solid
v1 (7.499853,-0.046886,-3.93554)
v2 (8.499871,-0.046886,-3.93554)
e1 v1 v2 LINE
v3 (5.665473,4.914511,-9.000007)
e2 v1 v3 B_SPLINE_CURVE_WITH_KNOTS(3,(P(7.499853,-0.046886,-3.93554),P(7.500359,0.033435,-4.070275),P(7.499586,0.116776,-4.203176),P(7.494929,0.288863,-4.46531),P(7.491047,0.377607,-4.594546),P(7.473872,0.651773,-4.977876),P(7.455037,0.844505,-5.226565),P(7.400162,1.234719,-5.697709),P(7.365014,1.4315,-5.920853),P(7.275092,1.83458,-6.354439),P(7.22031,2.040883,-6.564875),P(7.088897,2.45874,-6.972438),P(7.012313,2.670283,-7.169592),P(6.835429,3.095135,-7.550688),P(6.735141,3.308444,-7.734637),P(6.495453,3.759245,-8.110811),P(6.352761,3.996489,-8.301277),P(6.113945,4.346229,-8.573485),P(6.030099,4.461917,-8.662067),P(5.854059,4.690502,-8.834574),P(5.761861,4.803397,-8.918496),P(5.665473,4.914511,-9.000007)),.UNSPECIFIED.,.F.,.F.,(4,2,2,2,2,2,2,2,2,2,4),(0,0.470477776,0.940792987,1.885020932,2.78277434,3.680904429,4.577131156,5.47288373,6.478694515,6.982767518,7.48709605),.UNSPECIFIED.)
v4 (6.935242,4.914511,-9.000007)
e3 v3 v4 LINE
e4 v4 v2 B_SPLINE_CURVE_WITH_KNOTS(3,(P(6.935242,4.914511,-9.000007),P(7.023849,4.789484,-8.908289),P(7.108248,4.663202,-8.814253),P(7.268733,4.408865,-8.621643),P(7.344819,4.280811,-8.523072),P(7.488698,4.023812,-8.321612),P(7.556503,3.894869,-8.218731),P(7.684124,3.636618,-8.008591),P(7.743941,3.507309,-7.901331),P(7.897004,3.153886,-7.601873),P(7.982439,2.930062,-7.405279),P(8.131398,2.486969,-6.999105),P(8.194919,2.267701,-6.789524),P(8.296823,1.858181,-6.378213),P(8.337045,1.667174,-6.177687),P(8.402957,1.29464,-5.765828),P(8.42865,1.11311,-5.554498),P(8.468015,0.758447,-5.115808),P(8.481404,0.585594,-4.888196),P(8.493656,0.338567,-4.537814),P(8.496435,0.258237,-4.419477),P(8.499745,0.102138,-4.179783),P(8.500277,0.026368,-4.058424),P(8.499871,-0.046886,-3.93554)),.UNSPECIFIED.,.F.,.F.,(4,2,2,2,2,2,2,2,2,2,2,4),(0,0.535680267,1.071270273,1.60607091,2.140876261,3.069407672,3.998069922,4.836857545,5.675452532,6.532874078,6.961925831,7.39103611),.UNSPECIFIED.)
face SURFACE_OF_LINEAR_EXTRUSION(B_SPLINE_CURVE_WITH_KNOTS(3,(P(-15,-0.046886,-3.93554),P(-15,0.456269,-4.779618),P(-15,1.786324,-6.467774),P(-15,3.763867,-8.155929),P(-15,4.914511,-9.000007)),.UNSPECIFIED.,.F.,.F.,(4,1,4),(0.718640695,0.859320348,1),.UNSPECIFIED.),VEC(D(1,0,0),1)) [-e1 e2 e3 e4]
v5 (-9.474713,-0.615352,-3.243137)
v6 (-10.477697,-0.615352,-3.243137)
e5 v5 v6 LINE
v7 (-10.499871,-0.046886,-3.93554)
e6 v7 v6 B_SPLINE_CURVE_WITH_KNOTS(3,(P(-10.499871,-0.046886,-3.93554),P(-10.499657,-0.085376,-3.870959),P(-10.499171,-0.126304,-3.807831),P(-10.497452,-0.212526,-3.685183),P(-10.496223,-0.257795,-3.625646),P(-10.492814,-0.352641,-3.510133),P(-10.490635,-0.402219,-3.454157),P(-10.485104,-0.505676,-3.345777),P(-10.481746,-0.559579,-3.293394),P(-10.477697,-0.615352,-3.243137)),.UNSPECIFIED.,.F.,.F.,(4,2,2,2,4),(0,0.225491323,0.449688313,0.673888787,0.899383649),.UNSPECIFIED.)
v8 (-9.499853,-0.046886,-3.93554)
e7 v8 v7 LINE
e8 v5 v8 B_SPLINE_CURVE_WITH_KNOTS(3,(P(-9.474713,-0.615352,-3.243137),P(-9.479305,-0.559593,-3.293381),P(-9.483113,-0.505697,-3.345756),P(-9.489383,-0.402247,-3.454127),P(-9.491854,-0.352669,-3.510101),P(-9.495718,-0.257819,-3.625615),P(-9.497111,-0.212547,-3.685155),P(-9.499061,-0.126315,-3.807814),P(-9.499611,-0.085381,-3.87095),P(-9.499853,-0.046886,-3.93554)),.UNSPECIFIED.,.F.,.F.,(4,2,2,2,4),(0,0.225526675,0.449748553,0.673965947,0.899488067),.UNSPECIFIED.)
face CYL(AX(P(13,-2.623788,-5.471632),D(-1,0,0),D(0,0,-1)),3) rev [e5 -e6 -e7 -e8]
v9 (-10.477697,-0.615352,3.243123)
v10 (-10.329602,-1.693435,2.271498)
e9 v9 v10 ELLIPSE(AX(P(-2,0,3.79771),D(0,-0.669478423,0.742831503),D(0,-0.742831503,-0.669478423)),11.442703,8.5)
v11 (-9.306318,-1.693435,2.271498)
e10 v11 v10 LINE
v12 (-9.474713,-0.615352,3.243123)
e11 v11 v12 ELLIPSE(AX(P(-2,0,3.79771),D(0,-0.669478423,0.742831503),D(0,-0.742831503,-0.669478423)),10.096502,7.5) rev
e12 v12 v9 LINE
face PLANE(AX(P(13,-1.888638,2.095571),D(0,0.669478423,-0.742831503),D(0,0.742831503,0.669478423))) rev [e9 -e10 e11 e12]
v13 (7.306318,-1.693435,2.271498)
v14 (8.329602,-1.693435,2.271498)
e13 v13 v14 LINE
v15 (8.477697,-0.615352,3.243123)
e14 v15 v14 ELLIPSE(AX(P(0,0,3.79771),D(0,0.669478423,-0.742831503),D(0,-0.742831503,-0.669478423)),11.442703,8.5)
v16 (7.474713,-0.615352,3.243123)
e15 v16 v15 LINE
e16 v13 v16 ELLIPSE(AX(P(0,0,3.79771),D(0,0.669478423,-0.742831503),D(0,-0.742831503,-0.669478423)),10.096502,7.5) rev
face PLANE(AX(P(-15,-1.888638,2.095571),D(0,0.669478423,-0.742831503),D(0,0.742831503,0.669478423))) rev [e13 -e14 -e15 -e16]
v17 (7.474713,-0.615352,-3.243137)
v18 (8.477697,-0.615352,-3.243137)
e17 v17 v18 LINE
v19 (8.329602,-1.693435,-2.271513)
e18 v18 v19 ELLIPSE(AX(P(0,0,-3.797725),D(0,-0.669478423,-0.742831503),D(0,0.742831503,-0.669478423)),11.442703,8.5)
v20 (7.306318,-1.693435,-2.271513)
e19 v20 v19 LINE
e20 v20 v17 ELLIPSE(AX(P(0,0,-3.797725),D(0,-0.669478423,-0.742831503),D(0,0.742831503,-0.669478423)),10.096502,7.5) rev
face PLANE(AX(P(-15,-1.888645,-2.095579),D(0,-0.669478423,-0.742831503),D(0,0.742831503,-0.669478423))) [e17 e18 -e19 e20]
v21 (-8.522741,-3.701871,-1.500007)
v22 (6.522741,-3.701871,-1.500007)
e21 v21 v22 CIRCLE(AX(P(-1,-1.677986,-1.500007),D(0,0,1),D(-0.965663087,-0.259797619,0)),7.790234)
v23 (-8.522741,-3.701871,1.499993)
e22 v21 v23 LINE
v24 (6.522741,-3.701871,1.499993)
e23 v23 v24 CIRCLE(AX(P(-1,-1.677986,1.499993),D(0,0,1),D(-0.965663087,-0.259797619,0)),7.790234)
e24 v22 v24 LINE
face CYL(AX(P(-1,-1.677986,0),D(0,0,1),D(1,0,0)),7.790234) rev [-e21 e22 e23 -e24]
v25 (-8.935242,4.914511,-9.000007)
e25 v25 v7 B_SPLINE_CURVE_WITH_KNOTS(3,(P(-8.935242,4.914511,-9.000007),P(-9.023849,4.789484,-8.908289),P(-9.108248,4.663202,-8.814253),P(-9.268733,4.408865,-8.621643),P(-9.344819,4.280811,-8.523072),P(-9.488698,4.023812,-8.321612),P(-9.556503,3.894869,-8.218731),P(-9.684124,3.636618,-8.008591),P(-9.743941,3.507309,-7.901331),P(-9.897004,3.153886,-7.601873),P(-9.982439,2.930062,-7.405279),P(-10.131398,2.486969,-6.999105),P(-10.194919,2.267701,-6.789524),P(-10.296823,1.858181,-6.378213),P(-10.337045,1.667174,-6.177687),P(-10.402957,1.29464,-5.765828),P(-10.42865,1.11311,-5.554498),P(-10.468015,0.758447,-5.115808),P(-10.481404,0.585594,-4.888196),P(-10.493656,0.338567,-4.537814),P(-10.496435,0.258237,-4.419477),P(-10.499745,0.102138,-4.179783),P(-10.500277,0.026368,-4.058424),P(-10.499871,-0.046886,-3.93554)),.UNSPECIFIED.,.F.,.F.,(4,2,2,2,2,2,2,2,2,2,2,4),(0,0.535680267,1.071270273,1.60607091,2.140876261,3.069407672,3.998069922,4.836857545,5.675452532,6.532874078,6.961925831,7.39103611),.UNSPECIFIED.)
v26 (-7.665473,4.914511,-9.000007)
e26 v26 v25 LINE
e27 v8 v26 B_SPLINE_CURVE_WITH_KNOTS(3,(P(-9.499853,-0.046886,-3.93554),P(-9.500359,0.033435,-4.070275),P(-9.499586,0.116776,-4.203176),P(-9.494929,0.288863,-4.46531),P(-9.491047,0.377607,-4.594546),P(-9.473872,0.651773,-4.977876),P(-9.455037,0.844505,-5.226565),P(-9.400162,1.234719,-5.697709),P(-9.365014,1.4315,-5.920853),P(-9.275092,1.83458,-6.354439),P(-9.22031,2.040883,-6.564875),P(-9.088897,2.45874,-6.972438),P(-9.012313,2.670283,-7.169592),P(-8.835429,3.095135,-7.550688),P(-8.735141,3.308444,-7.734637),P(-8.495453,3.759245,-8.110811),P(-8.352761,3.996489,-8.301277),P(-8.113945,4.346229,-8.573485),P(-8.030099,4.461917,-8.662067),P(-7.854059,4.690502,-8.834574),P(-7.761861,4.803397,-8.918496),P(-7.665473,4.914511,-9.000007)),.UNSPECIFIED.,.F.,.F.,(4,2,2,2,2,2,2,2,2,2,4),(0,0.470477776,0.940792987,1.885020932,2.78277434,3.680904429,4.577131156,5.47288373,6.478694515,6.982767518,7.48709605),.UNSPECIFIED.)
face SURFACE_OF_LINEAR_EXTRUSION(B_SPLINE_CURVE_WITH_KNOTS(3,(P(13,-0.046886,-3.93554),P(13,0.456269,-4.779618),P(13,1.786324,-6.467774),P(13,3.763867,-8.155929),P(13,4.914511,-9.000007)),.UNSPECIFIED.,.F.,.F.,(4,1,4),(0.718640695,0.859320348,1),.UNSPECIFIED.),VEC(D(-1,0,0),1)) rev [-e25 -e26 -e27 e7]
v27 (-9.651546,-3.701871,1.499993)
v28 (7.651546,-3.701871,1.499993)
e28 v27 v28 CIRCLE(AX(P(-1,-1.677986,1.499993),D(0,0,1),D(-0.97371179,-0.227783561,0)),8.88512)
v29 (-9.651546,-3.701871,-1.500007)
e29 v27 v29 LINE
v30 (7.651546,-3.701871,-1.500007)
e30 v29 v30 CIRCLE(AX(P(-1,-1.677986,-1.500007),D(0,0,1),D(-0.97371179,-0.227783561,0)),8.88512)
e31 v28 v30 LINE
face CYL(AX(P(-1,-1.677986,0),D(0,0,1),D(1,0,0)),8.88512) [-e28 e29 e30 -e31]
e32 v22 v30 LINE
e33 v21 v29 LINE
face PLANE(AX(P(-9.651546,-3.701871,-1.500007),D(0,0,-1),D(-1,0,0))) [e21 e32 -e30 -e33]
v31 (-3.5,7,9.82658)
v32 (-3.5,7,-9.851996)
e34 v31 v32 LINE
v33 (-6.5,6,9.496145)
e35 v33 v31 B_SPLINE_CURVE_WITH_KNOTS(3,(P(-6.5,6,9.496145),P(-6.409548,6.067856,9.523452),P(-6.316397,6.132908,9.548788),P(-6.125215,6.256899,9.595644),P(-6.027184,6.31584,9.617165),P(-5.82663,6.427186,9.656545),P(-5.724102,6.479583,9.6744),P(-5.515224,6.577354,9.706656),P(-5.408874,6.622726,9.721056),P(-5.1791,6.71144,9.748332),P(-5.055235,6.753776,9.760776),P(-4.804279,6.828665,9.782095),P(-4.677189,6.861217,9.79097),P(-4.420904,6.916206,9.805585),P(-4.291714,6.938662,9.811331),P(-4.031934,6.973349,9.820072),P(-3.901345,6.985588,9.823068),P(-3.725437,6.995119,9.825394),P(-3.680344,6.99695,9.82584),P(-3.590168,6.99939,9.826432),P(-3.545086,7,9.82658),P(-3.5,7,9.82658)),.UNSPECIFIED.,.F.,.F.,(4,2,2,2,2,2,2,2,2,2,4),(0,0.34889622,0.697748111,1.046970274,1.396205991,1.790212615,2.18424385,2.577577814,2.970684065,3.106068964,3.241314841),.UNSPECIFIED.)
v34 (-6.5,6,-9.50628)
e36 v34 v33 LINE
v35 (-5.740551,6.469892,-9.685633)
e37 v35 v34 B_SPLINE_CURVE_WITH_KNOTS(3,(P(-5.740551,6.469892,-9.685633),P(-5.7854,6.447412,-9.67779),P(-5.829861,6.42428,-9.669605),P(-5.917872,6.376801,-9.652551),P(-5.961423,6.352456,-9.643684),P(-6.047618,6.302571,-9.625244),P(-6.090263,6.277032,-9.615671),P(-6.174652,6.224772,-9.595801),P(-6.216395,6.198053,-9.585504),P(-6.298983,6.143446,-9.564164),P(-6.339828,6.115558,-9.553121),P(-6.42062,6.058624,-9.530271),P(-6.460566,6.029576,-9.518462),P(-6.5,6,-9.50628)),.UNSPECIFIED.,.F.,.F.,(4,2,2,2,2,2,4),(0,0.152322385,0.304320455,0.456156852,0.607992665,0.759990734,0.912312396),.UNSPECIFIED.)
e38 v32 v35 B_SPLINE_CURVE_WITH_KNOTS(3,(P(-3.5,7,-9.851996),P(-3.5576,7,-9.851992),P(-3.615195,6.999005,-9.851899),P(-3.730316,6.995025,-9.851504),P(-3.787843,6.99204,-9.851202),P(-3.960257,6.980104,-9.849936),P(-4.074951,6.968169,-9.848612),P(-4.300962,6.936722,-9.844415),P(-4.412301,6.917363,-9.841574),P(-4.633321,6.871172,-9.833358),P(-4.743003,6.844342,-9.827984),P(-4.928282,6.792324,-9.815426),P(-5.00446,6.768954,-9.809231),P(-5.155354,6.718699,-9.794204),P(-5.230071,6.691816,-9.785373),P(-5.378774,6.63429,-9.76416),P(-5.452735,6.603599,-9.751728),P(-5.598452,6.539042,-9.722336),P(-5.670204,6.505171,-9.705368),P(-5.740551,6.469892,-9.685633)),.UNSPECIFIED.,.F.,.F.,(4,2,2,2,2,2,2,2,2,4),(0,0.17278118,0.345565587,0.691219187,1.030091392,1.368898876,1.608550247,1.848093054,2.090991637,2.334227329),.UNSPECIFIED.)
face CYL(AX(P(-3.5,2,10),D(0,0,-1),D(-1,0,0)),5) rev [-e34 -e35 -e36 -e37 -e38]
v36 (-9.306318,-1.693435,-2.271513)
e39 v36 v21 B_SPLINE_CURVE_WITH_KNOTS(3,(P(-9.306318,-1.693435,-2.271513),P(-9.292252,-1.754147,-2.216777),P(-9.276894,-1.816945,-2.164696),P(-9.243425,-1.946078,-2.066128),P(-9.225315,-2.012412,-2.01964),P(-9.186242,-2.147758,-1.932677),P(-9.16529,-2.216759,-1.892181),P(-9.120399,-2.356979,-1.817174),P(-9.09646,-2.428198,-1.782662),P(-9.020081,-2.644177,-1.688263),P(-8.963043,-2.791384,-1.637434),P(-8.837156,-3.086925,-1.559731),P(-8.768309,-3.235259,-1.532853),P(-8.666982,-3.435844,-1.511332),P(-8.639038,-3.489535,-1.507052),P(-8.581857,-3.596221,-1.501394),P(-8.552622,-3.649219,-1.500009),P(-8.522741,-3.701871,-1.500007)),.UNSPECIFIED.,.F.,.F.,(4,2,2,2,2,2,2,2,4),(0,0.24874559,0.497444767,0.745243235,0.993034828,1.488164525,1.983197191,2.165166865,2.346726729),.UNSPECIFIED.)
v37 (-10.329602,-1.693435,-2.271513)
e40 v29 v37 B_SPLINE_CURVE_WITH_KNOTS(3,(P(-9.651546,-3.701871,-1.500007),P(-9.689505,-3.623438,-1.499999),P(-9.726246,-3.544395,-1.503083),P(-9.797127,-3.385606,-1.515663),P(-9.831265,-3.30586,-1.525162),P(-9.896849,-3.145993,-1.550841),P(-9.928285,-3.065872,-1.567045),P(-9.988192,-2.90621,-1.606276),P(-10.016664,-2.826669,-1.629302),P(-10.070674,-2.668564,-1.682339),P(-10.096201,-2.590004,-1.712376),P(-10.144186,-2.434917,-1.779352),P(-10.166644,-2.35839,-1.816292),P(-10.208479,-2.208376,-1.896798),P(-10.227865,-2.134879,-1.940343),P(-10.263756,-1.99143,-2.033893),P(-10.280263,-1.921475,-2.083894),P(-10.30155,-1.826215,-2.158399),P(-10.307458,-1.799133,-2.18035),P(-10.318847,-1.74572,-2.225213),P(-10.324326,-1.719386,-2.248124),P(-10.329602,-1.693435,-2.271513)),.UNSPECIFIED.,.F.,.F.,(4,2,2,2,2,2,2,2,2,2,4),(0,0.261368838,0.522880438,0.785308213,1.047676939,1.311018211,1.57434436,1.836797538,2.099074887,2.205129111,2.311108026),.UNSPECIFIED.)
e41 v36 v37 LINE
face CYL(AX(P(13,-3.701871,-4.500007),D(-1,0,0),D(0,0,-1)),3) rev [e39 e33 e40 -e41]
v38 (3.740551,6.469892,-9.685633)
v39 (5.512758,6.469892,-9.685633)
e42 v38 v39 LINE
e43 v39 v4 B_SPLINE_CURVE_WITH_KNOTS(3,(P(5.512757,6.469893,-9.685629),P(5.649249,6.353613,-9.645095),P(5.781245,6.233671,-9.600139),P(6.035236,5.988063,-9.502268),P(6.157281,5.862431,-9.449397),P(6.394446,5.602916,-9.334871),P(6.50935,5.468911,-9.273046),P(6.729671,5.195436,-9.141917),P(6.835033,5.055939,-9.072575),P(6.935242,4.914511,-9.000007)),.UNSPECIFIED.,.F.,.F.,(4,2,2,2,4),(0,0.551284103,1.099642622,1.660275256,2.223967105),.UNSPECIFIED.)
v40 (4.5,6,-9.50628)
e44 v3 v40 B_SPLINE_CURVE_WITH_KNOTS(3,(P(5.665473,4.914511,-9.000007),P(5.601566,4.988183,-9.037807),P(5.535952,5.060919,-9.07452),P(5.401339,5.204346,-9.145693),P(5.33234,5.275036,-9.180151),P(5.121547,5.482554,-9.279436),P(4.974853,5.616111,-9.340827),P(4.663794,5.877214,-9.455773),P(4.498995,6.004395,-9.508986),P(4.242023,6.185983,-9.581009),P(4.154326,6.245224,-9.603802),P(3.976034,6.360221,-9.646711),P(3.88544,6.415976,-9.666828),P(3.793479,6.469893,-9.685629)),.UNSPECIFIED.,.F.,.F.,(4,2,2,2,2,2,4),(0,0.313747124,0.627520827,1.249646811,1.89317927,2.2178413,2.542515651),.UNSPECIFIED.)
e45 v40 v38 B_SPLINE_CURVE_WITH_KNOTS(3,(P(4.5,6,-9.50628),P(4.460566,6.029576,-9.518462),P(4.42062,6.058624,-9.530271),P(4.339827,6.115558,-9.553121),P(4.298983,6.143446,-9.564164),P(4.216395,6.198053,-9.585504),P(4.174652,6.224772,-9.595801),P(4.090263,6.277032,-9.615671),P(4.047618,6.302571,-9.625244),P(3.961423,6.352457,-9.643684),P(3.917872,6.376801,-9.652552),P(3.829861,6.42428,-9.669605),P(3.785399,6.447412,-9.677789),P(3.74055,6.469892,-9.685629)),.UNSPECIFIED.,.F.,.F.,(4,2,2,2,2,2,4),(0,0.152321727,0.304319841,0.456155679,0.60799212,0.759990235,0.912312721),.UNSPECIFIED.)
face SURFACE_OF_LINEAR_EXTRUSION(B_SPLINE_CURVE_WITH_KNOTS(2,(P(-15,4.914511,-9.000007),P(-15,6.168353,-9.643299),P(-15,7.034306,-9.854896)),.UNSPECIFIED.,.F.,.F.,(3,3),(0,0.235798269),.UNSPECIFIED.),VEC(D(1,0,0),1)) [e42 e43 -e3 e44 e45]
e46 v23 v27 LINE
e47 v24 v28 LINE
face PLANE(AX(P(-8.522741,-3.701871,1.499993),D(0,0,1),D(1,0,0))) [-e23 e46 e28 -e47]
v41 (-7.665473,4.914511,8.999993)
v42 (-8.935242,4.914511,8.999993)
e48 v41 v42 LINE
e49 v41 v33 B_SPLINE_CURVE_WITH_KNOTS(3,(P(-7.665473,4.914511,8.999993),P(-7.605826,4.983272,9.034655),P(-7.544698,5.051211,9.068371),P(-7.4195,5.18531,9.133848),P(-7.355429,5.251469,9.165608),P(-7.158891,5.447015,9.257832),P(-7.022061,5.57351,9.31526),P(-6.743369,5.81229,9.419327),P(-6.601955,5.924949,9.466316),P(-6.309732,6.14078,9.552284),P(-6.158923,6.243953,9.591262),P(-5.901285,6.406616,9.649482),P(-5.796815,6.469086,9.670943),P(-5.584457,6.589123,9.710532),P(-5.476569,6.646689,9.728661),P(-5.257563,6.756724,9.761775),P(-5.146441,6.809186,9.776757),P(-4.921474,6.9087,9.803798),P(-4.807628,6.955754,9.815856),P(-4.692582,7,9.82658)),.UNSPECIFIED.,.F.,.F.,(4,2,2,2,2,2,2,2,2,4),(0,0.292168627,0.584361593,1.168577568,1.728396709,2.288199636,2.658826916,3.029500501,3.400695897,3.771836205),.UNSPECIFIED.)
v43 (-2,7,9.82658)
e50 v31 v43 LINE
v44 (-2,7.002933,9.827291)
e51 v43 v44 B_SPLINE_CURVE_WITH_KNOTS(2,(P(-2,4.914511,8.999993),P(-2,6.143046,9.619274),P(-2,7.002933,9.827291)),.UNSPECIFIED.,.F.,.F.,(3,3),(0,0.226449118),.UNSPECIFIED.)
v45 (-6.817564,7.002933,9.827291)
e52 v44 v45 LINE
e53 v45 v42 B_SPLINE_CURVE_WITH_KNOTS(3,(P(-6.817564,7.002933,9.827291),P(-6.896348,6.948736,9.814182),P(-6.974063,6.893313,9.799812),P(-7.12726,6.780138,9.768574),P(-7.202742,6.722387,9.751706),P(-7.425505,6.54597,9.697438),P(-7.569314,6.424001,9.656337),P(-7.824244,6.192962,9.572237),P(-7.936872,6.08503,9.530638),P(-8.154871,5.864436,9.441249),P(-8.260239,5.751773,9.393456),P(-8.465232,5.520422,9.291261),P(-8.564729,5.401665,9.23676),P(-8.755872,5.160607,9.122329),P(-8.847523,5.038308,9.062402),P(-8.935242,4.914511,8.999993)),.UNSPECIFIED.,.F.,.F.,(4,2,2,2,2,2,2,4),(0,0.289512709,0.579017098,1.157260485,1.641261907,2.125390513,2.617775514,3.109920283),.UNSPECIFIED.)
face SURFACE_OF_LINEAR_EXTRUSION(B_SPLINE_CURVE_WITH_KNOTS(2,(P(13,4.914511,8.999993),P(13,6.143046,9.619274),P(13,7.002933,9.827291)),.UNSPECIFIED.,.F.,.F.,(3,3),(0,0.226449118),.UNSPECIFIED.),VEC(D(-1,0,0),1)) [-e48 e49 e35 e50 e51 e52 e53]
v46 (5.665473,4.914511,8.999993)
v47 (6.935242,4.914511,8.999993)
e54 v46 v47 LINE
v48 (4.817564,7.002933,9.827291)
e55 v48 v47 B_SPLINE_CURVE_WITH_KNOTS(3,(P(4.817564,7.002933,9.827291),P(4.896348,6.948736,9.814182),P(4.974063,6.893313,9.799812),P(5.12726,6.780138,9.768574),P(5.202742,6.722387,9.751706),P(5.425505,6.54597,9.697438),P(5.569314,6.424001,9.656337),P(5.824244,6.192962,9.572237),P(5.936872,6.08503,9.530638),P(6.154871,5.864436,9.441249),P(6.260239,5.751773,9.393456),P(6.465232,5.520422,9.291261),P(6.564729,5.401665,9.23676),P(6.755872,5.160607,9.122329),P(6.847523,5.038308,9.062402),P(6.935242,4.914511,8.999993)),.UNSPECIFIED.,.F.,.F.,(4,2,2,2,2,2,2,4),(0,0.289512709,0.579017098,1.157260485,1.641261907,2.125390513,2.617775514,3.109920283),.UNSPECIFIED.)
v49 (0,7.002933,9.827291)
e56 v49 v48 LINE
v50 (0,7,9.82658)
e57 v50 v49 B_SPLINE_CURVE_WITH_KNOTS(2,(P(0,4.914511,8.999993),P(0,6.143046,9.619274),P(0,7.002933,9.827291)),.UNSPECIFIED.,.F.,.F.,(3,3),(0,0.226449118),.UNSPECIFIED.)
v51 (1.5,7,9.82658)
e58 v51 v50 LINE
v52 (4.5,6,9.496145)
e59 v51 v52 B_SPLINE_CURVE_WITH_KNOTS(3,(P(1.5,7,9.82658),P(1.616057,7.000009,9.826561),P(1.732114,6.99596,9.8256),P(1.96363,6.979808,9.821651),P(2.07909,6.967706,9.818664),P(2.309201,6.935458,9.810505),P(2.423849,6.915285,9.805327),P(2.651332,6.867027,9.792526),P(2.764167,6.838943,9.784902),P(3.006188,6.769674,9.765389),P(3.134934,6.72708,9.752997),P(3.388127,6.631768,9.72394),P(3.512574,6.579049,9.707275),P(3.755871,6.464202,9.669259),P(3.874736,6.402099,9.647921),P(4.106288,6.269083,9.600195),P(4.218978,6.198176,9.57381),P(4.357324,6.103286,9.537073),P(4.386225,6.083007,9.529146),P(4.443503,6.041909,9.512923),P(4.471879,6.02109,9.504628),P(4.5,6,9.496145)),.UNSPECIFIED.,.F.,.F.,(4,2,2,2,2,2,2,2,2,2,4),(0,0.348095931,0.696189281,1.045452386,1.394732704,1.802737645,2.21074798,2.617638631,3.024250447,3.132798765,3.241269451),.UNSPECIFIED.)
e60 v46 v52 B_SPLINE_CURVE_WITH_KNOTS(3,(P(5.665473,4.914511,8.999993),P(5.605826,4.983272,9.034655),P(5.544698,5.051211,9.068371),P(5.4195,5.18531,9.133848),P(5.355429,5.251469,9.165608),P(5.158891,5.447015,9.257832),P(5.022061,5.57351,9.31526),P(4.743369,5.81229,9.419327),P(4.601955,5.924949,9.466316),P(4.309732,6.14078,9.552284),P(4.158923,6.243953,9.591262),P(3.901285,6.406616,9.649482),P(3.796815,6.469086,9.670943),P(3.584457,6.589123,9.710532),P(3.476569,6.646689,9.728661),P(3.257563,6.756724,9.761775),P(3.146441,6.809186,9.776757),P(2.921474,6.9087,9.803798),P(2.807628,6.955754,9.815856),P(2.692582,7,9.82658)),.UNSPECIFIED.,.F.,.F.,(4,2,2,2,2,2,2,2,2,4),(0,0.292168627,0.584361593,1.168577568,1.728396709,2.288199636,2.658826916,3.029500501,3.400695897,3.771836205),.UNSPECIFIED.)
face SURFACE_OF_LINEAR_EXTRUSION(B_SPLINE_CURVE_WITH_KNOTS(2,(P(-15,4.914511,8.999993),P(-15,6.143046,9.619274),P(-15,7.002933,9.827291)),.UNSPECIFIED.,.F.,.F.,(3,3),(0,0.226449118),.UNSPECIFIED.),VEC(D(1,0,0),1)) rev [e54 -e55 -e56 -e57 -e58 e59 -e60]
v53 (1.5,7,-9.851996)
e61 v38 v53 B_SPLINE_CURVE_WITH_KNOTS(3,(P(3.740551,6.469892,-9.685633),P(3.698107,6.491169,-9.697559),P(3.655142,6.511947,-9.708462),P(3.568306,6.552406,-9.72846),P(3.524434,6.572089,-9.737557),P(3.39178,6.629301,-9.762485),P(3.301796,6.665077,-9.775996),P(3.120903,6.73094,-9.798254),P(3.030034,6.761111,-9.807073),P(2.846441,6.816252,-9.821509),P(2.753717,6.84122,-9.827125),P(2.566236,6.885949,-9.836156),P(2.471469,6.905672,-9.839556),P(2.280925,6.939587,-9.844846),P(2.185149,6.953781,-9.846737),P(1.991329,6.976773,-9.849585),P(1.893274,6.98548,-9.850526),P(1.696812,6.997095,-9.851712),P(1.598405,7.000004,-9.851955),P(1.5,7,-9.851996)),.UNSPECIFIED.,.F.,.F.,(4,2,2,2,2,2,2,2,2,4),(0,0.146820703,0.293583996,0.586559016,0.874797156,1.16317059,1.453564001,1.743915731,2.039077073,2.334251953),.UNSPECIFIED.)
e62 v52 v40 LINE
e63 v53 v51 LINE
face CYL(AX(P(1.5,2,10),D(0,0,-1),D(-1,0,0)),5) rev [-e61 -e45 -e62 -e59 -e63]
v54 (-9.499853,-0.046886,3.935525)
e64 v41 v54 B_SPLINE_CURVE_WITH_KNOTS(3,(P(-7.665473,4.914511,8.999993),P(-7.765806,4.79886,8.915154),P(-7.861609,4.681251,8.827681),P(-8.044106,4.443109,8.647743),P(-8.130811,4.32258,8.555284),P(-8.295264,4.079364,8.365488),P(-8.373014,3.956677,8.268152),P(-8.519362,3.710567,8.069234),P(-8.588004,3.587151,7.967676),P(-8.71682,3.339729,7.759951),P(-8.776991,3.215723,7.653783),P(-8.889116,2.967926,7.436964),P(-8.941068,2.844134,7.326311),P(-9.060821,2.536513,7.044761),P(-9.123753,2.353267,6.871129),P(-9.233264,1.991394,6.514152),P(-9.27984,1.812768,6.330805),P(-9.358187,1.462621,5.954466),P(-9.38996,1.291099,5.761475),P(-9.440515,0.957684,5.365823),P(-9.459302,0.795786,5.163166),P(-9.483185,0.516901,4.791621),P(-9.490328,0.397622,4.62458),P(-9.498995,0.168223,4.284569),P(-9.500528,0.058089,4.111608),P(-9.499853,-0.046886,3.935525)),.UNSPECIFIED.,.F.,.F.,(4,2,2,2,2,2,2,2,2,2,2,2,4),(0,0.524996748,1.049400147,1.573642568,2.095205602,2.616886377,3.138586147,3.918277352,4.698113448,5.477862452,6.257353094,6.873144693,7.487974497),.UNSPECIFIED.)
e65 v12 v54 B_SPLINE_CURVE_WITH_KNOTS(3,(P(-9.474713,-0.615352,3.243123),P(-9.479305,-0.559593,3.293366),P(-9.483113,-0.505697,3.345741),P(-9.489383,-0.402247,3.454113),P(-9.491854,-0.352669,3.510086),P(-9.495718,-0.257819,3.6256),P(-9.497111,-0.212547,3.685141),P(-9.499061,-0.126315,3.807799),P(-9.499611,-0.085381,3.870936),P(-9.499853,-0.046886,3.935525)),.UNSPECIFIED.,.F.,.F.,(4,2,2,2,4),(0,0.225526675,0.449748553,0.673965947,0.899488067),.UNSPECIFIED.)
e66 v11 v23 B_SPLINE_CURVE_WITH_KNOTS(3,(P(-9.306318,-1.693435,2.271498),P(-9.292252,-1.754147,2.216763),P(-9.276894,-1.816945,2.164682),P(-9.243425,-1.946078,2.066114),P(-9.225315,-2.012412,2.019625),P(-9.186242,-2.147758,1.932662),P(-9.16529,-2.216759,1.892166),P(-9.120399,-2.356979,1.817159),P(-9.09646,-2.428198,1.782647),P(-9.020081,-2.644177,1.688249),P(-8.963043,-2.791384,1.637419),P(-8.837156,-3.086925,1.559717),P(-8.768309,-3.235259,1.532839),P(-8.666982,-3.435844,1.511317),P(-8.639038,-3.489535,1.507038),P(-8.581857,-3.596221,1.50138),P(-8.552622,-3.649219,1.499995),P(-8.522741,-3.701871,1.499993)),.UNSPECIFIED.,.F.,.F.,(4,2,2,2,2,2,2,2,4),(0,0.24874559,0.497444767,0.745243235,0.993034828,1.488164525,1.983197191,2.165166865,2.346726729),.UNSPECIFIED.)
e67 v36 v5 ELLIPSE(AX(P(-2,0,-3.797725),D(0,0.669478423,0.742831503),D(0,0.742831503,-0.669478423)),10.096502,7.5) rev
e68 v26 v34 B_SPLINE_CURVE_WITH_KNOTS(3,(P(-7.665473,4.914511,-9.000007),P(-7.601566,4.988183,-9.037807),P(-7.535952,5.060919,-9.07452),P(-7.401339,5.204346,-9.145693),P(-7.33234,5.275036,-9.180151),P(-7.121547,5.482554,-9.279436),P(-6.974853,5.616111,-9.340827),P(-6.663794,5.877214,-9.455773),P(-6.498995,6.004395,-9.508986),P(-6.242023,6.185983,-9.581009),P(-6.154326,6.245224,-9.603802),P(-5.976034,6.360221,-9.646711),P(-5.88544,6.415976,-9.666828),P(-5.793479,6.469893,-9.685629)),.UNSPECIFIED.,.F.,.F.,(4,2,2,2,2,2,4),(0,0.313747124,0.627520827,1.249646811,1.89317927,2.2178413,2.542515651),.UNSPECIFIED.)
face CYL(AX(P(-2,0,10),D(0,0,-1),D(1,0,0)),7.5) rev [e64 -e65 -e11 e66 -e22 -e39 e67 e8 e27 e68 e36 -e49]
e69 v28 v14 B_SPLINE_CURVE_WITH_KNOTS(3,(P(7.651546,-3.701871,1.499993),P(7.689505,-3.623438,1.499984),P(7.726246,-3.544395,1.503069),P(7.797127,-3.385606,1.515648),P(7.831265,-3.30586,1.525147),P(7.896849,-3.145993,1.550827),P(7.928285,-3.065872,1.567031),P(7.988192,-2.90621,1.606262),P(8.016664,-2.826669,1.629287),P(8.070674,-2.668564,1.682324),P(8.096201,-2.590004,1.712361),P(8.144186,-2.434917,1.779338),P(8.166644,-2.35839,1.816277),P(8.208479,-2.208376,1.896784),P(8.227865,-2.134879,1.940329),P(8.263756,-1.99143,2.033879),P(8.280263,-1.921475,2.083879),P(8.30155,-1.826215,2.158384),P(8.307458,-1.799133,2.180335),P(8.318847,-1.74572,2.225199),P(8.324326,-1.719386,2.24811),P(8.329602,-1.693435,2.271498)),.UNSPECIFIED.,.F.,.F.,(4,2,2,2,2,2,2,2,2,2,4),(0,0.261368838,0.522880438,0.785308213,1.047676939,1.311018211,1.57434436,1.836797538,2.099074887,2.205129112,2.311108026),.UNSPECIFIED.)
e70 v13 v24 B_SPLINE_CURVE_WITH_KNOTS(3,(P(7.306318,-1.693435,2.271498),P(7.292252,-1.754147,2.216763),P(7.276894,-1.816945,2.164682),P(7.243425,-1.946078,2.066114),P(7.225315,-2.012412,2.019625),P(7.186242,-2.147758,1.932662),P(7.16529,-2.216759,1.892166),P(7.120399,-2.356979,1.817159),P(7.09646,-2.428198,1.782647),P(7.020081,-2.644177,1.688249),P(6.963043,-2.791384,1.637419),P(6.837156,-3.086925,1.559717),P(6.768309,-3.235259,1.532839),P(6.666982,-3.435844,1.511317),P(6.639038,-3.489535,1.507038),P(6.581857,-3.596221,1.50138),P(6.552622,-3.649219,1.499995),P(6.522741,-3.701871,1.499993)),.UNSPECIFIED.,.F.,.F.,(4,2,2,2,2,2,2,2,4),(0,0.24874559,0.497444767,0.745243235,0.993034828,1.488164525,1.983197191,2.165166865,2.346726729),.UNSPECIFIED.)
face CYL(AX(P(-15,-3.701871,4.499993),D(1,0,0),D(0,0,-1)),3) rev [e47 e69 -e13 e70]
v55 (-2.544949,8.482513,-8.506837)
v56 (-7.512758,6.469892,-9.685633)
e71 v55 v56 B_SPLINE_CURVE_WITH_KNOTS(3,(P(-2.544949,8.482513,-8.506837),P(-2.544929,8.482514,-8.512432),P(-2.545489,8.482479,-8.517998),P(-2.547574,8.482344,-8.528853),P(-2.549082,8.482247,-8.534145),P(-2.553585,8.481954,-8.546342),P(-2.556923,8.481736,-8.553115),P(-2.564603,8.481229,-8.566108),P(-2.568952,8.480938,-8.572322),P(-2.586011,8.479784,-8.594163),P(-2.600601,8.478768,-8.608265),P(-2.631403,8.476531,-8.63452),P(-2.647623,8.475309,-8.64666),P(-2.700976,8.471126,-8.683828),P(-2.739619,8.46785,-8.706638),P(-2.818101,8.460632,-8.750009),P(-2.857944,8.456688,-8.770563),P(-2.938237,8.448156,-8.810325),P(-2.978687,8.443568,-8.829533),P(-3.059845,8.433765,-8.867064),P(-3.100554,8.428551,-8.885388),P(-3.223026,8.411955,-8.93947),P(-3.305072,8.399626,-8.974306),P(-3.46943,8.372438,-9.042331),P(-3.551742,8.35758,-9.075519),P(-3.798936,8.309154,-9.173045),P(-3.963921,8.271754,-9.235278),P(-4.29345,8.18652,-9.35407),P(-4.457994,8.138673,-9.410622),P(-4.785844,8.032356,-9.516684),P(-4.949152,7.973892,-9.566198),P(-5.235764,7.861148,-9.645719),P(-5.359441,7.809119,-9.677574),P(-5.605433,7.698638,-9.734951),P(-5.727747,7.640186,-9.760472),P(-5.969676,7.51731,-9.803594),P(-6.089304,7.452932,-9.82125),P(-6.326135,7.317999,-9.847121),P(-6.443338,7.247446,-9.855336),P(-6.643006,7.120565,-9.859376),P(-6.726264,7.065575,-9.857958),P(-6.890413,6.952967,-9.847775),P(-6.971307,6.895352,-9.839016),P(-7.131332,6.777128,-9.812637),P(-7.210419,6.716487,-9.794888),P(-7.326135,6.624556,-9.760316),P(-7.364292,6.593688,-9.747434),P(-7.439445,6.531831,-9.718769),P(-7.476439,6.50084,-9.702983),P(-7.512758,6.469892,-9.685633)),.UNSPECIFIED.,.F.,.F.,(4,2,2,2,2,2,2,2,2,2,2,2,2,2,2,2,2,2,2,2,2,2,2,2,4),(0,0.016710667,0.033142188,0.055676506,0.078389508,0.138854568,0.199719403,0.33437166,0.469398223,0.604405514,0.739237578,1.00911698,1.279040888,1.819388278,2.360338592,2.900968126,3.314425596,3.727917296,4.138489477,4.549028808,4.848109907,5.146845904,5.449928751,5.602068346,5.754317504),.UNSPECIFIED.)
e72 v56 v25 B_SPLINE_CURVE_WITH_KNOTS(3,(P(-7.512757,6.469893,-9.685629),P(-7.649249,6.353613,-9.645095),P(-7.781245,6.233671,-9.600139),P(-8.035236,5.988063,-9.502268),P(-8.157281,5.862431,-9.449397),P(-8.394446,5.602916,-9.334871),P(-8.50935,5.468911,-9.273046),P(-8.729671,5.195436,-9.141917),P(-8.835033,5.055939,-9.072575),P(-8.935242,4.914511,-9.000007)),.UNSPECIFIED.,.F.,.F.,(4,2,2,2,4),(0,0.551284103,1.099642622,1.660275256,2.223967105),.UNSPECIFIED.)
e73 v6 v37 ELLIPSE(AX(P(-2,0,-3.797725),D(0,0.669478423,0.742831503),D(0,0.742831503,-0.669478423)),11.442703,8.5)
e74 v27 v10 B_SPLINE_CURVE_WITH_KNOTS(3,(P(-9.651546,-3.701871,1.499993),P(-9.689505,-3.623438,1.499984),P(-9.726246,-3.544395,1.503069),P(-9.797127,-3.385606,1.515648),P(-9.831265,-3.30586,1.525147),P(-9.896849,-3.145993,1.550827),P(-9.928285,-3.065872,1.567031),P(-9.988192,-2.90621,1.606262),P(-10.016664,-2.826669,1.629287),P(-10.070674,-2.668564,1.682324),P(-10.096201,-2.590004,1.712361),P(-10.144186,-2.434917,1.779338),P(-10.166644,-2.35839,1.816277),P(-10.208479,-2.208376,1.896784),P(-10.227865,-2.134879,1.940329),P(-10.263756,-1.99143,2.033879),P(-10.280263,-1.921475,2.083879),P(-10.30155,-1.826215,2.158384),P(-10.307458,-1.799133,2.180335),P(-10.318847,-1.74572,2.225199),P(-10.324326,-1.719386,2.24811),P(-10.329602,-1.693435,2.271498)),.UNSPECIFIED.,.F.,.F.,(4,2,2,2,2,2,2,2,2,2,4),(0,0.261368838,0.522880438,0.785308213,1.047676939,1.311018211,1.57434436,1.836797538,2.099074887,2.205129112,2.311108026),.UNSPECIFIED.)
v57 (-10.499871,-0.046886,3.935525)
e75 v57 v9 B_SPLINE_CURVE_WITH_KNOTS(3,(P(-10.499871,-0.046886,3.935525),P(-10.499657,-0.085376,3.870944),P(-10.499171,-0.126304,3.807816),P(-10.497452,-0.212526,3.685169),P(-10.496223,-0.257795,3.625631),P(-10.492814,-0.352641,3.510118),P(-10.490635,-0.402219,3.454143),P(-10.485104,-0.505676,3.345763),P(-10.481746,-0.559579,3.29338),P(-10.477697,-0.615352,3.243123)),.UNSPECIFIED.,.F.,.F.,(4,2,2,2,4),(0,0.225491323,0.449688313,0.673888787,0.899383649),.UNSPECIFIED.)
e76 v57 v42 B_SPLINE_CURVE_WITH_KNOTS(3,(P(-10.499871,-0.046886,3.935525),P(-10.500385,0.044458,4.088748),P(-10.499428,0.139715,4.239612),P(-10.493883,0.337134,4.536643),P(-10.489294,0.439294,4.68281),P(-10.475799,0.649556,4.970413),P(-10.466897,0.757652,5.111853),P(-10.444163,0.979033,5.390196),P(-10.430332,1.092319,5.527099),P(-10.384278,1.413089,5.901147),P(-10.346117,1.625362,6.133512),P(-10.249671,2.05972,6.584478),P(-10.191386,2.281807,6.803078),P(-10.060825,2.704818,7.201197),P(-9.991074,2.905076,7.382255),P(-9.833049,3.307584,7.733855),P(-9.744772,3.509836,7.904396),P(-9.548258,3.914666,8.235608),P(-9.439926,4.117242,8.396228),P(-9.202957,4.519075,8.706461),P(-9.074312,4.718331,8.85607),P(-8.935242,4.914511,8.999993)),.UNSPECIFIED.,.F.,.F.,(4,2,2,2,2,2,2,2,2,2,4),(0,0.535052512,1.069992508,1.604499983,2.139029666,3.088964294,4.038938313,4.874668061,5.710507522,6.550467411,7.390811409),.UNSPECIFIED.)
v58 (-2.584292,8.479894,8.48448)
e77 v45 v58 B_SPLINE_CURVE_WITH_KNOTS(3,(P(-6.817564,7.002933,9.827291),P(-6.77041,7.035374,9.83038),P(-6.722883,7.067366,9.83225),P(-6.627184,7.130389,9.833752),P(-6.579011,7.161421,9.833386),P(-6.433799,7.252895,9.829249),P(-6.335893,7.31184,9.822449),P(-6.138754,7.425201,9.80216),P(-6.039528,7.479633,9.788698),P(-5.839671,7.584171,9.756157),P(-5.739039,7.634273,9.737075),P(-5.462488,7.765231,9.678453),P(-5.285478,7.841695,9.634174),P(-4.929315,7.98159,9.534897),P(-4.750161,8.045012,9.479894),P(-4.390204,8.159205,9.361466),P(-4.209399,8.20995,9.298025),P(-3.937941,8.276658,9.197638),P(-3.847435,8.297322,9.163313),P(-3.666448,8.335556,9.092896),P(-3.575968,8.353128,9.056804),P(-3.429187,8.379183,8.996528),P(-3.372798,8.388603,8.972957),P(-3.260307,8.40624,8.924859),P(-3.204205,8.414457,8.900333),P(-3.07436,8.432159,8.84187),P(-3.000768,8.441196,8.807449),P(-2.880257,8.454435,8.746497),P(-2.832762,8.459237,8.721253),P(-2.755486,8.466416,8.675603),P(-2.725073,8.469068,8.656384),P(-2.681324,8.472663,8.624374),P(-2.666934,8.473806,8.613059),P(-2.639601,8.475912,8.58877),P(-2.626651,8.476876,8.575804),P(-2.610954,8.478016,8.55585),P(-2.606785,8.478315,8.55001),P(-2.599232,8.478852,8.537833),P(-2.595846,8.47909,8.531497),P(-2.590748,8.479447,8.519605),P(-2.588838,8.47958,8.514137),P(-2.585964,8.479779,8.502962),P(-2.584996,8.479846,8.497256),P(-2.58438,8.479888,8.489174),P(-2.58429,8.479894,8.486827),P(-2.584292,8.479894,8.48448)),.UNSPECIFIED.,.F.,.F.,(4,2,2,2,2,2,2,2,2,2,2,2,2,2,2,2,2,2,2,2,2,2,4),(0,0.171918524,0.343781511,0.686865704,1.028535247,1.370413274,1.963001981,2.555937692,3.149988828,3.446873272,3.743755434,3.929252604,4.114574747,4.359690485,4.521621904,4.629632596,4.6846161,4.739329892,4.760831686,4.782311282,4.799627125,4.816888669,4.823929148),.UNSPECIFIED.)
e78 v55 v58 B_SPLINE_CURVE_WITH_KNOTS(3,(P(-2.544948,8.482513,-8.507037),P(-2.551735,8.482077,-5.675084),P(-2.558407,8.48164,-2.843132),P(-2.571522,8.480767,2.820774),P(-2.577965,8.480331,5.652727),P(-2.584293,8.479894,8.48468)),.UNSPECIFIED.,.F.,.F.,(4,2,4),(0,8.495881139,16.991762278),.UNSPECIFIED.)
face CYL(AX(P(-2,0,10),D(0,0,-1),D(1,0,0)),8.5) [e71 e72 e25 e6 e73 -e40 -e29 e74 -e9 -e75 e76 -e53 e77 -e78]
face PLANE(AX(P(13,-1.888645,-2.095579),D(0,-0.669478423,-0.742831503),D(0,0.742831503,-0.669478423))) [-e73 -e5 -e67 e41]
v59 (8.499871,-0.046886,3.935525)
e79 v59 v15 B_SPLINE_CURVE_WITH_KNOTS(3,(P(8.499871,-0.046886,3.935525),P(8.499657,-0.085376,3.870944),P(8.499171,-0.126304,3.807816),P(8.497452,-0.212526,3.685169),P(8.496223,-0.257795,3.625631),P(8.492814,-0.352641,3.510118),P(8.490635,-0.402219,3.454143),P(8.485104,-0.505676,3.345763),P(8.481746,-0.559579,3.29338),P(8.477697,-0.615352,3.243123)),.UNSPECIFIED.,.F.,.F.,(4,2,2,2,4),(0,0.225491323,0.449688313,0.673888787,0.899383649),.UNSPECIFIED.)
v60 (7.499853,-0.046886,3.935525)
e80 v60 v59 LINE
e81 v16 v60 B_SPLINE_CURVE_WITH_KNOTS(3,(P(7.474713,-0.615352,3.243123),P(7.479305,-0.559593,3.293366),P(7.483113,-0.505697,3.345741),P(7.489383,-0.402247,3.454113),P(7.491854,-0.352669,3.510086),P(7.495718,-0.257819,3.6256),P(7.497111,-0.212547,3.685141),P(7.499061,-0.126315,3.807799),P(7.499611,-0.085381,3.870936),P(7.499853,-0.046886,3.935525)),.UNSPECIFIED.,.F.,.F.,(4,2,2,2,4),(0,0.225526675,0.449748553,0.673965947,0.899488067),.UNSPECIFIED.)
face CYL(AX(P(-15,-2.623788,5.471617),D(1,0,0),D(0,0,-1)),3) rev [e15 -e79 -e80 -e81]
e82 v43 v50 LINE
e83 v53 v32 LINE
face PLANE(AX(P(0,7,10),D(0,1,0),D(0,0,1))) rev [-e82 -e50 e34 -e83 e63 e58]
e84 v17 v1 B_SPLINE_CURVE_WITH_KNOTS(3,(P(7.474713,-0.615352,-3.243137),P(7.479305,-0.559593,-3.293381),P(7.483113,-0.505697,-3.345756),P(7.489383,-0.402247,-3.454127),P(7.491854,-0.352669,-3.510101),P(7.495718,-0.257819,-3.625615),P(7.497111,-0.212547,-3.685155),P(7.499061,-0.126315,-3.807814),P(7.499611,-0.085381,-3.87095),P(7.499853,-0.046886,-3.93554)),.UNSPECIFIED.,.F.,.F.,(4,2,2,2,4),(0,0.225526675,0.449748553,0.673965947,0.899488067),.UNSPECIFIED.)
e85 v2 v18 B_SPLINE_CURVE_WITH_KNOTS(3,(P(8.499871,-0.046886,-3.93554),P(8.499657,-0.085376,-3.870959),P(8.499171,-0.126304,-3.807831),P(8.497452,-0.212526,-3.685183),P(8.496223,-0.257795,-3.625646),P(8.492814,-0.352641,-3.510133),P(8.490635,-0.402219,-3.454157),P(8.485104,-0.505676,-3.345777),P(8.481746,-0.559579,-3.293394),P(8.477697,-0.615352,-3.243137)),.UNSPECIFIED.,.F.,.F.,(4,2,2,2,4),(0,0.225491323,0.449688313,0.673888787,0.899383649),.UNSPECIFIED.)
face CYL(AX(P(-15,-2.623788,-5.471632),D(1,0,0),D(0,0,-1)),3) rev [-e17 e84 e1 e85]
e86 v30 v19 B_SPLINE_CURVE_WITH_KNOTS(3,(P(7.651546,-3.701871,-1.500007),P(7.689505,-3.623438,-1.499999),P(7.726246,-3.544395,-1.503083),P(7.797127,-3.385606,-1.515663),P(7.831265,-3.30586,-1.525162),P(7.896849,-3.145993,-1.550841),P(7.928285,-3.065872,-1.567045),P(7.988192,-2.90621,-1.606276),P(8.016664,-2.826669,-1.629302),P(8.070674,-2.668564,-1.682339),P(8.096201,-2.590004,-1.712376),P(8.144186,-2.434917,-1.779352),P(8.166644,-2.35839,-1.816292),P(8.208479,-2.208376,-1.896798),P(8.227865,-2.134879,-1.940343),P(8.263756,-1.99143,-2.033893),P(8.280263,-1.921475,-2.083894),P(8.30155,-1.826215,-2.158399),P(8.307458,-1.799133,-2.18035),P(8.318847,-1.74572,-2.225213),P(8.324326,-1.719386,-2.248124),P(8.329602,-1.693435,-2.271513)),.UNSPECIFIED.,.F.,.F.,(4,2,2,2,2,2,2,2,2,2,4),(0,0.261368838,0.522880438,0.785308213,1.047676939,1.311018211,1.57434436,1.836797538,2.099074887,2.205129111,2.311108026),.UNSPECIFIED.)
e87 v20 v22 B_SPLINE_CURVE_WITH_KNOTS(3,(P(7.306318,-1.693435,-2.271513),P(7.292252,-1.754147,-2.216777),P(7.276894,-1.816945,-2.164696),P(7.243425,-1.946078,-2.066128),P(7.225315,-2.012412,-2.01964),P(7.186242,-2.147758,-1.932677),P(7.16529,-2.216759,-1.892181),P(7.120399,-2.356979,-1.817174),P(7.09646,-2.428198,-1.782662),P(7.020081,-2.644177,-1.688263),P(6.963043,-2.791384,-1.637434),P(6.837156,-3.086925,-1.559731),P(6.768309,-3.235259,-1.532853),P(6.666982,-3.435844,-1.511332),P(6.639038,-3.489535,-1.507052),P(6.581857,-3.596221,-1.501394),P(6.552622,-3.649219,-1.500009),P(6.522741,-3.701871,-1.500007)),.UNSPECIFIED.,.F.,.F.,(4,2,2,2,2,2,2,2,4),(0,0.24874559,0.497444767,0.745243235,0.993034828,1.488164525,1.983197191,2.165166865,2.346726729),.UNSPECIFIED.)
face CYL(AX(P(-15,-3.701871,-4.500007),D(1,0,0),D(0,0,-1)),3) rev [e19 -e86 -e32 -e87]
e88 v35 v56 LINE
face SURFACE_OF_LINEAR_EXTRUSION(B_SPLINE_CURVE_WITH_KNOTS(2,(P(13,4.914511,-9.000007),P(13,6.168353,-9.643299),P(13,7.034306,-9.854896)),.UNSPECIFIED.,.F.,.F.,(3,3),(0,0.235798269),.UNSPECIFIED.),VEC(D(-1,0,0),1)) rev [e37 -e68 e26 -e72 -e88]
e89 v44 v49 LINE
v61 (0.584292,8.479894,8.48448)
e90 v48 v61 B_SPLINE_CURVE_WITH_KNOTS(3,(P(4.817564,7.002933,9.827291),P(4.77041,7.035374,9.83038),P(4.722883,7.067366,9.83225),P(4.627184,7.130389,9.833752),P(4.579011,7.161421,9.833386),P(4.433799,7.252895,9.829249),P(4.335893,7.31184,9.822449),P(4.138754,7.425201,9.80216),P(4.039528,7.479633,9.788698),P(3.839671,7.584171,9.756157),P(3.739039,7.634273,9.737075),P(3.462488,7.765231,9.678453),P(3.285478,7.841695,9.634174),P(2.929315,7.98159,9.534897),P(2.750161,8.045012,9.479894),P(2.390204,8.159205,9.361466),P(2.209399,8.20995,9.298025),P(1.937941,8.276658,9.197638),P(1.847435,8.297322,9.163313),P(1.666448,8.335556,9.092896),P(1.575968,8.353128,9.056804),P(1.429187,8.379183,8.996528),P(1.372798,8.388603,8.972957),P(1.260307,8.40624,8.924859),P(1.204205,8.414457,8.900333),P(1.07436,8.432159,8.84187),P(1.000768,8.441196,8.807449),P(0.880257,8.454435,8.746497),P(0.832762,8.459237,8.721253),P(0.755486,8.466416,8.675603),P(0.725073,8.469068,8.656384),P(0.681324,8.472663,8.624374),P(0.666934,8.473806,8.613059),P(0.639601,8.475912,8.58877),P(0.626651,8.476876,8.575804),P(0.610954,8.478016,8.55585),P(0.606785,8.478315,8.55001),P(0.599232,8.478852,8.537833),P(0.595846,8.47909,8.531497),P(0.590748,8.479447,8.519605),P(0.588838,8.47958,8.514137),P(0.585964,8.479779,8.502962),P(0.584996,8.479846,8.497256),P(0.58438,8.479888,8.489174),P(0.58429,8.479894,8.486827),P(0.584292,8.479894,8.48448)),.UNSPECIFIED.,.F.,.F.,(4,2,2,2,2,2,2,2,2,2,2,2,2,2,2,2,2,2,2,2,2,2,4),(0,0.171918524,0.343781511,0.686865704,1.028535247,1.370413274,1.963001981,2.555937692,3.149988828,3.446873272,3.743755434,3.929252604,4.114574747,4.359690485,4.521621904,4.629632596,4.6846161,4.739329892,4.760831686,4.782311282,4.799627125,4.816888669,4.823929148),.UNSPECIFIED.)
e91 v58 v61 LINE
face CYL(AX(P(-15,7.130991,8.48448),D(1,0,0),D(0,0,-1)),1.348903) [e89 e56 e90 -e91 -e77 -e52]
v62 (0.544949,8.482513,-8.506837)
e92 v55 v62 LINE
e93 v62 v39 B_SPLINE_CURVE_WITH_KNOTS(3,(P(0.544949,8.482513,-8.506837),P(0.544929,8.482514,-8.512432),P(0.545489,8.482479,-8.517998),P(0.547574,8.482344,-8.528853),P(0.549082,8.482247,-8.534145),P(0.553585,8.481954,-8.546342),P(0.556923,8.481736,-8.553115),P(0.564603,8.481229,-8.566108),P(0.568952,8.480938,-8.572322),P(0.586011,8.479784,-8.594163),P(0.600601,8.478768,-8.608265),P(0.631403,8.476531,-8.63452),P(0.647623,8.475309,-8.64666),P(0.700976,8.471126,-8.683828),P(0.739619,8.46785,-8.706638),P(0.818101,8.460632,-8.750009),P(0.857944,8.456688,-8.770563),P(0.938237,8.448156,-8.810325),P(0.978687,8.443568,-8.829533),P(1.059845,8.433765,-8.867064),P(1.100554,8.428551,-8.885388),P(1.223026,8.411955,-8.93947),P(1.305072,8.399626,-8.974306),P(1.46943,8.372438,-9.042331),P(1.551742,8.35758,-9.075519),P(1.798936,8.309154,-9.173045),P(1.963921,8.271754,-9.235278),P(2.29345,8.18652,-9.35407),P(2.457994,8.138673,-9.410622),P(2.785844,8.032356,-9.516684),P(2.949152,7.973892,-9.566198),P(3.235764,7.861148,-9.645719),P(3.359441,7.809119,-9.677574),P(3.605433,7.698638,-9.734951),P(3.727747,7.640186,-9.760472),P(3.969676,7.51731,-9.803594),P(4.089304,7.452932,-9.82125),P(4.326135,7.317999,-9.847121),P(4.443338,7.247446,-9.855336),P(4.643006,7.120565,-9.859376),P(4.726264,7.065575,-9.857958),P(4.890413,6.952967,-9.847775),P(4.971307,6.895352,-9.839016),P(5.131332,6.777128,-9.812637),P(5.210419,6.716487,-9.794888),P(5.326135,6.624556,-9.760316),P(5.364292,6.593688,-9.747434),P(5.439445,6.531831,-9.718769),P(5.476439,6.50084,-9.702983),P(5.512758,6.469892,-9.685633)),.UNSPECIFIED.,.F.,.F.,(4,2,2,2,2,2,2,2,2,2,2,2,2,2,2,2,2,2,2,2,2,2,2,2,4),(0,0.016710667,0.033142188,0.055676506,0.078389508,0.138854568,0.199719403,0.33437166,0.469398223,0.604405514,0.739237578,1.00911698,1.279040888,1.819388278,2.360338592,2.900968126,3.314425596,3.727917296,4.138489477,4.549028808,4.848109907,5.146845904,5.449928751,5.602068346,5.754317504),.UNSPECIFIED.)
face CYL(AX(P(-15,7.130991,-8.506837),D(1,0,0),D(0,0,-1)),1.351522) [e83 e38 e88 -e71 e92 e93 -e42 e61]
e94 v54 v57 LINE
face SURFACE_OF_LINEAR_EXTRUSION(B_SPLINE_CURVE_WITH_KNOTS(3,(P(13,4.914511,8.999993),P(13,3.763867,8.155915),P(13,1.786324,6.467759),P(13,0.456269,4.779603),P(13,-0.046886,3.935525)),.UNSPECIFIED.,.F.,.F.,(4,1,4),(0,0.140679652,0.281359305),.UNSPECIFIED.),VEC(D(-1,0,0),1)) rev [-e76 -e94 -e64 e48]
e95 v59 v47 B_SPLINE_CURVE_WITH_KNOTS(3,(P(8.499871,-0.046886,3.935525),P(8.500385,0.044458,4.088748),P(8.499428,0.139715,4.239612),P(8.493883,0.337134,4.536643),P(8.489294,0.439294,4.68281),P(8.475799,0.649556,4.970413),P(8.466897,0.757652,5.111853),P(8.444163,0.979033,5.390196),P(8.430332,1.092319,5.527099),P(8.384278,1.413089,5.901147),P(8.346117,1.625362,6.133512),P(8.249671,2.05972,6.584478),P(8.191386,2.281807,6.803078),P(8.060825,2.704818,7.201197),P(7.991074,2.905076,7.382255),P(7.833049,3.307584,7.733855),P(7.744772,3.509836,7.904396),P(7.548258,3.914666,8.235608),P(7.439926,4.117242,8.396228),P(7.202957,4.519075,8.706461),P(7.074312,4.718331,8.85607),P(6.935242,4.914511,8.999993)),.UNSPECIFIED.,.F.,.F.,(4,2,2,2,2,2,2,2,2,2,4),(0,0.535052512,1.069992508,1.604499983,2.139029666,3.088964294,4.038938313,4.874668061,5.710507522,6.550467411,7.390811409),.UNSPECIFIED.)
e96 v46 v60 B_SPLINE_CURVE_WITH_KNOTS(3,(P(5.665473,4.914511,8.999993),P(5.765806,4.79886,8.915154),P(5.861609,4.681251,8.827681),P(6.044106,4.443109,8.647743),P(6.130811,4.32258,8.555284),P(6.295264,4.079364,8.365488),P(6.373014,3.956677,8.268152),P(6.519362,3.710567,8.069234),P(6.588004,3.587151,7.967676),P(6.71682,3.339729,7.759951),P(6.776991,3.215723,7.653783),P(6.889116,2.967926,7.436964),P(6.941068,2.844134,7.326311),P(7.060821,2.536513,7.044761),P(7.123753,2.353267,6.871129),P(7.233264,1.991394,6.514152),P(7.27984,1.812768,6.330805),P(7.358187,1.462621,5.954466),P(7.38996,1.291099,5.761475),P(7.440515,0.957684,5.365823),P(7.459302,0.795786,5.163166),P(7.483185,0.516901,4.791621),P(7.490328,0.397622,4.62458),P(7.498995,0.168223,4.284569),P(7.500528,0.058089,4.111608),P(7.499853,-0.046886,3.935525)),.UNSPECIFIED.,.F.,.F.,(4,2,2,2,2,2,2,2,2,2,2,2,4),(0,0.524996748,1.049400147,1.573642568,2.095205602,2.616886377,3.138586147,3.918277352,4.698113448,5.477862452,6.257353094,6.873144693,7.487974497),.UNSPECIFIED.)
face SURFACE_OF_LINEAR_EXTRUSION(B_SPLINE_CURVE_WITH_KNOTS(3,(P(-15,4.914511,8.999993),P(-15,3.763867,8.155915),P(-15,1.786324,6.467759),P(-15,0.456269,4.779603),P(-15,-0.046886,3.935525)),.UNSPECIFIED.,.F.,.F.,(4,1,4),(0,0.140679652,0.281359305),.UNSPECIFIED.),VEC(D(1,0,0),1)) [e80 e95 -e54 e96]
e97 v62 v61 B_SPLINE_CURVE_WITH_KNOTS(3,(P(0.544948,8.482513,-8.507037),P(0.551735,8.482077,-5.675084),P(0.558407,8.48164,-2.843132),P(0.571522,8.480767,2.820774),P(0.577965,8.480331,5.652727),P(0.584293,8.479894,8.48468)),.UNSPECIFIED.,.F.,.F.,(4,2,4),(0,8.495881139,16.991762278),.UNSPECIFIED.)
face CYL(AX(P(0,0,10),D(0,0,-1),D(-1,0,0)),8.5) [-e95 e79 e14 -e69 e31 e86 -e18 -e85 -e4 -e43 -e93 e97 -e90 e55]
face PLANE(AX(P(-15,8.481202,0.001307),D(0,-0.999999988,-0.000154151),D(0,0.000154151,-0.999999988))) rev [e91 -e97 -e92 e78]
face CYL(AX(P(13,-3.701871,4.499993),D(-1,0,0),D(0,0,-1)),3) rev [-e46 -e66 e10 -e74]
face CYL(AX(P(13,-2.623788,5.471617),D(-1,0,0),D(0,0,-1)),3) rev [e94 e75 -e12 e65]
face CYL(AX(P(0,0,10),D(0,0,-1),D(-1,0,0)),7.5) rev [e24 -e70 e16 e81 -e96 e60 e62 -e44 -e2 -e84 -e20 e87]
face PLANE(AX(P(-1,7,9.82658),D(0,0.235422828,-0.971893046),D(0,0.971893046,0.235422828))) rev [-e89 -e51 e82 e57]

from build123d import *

# Parameters (mm, degrees)
RESSALTO_EXTRUS_O1_DEPTH  = 10
CORTE_EXTRUS_O8_OUTLINE_W = 20
CORTE_EXTRUS_O8_OUTLINE_H = 20
CORTE_EXTRUS_O8_DEPTH     = 8.5
RESSALTO_EXTRUS_O2_START  = 1
RESSALTO_EXTRUS_O2_DEPTH  = 1
VARREDURA3_START          = -1.500007282
VARREDURA3_DEPTH          = 3
CORTE_EXTRUS_O9_DEPTH     = 15.5
FILETE1_R                 = 5


# Read off the part's stored shape, not the designer's step: Corte-extrusão8, Varredura3
with BuildPart() as part:
    # Esboço1 → Ressalto-extrusão1 (new, symmetric)
    with BuildSketch(Plane.XY):
        with BuildLine():
            Line((0, 8.5), (0, 7))
            Line((0, 7), (2.692582404, 7))
            ThreePointArc((2.692582404, 7), (7.373940602, -1.369306394), (0, -7.5))
            Line((0, -7.5), (0, -8.5))
            ThreePointArc((0, -8.5), (8.5, 0), (0, 8.5))
        make_face()
    extrude(amount=RESSALTO_EXTRUS_O1_DEPTH, both=True)

    # Corte-extrusão8 outline → Corte-extrusão8 (cut)
    with BuildSketch(Plane(origin=(0, 0, 0), x_dir=(0, 0, -1), z_dir=(1, 0, 0))):
        Rectangle(CORTE_EXTRUS_O8_OUTLINE_W, CORTE_EXTRUS_O8_OUTLINE_H)
        with BuildLine():
            add(Edge.make_bspline(
                [(9.000007282, 4.914510614), (9.447062759, 5.785868524), (9.685629081, 6.469892836)],
                knots=[0, 0, 0, 0.163868034, 0.163868034, 0.163868034], degree=2))
            add(Edge.make_bspline(
                [(3.935539792, -0.04688611), (4.779617707, 0.456269007), (6.467773537, 1.786323577), (8.155929367, 3.763866822), (9.000007282, 4.914510614)],
                knots=[0.718640695, 0.718640695, 0.718640695, 0.718640695, 0.859320348, 1, 1, 1, 1], degree=3))
            ThreePointArc((3.935539792, -0.04688611), (3.567999305, -0.305127766), (3.243137148, -0.615352428))
            Line((3.243137148, -0.615352428), (2.271512773, -1.693435261))
            ThreePointArc((2.271512773, -1.693435261), (1.699517724, -2.626111152), (1.500007282, -3.701870529))
            Line((1.500007282, -3.701870529), (-1.499992718, -3.701870529))
            ThreePointArc((-1.499992718, -3.701870529), (-1.69950316, -2.626111152), (-2.271498209, -1.693435261))
            Line((-2.271498209, -1.693435261), (-3.243122584, -0.615352428))
            ThreePointArc((-3.243122584, -0.615352428), (-3.567984742, -0.305127766), (-3.935525229, -0.04688611))
            add(Edge.make_bspline(
                [(-8.999992718, 4.914510614), (-8.155914803, 3.763866822), (-6.467758973, 1.786323577), (-4.779603143, 0.456269007), (-3.935525229, -0.04688611)],
                knots=[0, 0, 0, 0, 0.140679652, 0.281359305, 0.281359305, 0.281359305, 0.281359305], degree=3))
            add(Edge.make_bspline(
                [(-8.999992718, 4.914510614), (-9.619273552, 6.143045831), (-9.827290671, 7.002933405)],
                knots=[0, 0, 0, 0.226449118, 0.226449118, 0.226449118], degree=2))
            ThreePointArc((-9.827290671, 7.002933405), (-9.482547244, 8.038405471), (-8.484479959, 8.479894004))
            Line((-8.484479959, 8.479894004), (8.506836552, 8.482513232))
            ThreePointArc((8.506836552, 8.482513232), (9.673048984, 7.814043651), (9.685629081, 6.469892836))
        make_face(mode=Mode.SUBTRACT)
    extrude(amount=CORTE_EXTRUS_O8_DEPTH, mode=Mode.SUBTRACT)

    # Esboço22 → Ressalto-extrusão2 (add)
    with BuildSketch(Plane.ZY.offset(RESSALTO_EXTRUS_O2_START)):
        with BuildLine():
            Line((-9.85199593, 7), (9.826580108, 6.999999994))
            Line((9.826580108, 6.999999994), (9.827290671, 7.002933405))
            ThreePointArc((9.827290671, 7.002933405), (9.482547244, 8.038405471), (8.484479959, 8.479894004))
            Line((8.484479959, 8.479894004), (-8.506836552, 8.48251324))
            ThreePointArc((-8.506836552, 8.48251324), (-9.507748545, 8.039169154), (-9.85199593, 7))
        make_face()
    extrude(amount=-RESSALTO_EXTRUS_O2_DEPTH)

    # Espelhar17: part across plane


with BuildPart() as part_1:
    add(part.part)
    add(part.part.mirror(Plane(origin=(-1, 0, 0), x_dir=(0, 0, 1), z_dir=(1, 0, 0))))

    # Varredura3 outline → Varredura3 (add)
    with BuildSketch(Plane.XY.offset(VARREDURA3_START)):
        with BuildLine():
            ThreePointArc((6.52274134, -3.701870529), (6.829918041, -3.098744835), (7.081469689, -2.470381964))
            Line((7.081469689, -2.470381964), (6.760891253, -2.353494698))
            ThreePointArc((6.760891253, -2.353494698), (6.671498267, -3.032925038), (6.52274134, -3.701870529))
        make_face()
        with BuildLine():
            Line((7.651545895, -3.701870529), (6.52274134, -3.701870529))
            ThreePointArc((6.52274134, -3.701870529), (-1, -9.46822023), (-8.52274134, -3.701870529))
            Line((-8.52274134, -3.701870529), (-9.651545895, -3.701870529))
            ThreePointArc((-9.651545895, -3.701870529), (-1, -10.563106097), (7.651545895, -3.701870529))
        make_face()
    extrude(amount=VARREDURA3_DEPTH)

    # Esboço24 → Corte-extrusão9 (cut, symmetric)
    with BuildSketch(Plane.XY):
        with BuildLine():
            Line((-4.692582404, 7), (2.692582404, 7))
            ThreePointArc((2.692582404, 7), (4.307155609, 6.139903139), (5.665473098, 4.914510614))
            ThreePointArc((5.665473098, 4.914510614), (7.034580308, 2.600899823), (7.499853445, -0.04688611))
            ThreePointArc((7.499853445, -0.04688611), (7.492676559, -0.331357775), (7.474713465, -0.615352428))
            ThreePointArc((7.474713465, -0.615352428), (7.410147472, -1.157460341), (7.30631761, -1.693435261))
            ThreePointArc((7.30631761, -1.693435261), (6.987071698, -2.725954711), (6.52274134, -3.701870529))
            ThreePointArc((6.52274134, -3.701870529), (-1, -9.46822023), (-8.52274134, -3.701870529))
            ThreePointArc((-8.52274134, -3.701870529), (-8.987071698, -2.725954711), (-9.30631761, -1.693435261))
            ThreePointArc((-9.30631761, -1.693435261), (-9.410147472, -1.157460341), (-9.474713465, -0.615352428))
            ThreePointArc((-9.474713465, -0.615352428), (-9.492676559, -0.331357775), (-9.499853445, -0.04688611))
            ThreePointArc((-9.499853445, -0.04688611), (-9.034580308, 2.600899823), (-7.665473098, 4.914510614))
            ThreePointArc((-7.665473098, 4.914510614), (-6.307155609, 6.139903139), (-4.692582404, 7))
        make_face()
    extrude(amount=CORTE_EXTRUS_O9_DEPTH, both=True, mode=Mode.SUBTRACT)

    # Filete1
    filete1_edges = [part_1.edges().sort_by_distance(p)[0] for p in [
        (-4.692582404, 7, -0.01270694),
        (2.692582404, 7, -0.01270694),
    ]]
    fillet(filete1_edges, radius=FILETE1_R)


solid = part_1.part
